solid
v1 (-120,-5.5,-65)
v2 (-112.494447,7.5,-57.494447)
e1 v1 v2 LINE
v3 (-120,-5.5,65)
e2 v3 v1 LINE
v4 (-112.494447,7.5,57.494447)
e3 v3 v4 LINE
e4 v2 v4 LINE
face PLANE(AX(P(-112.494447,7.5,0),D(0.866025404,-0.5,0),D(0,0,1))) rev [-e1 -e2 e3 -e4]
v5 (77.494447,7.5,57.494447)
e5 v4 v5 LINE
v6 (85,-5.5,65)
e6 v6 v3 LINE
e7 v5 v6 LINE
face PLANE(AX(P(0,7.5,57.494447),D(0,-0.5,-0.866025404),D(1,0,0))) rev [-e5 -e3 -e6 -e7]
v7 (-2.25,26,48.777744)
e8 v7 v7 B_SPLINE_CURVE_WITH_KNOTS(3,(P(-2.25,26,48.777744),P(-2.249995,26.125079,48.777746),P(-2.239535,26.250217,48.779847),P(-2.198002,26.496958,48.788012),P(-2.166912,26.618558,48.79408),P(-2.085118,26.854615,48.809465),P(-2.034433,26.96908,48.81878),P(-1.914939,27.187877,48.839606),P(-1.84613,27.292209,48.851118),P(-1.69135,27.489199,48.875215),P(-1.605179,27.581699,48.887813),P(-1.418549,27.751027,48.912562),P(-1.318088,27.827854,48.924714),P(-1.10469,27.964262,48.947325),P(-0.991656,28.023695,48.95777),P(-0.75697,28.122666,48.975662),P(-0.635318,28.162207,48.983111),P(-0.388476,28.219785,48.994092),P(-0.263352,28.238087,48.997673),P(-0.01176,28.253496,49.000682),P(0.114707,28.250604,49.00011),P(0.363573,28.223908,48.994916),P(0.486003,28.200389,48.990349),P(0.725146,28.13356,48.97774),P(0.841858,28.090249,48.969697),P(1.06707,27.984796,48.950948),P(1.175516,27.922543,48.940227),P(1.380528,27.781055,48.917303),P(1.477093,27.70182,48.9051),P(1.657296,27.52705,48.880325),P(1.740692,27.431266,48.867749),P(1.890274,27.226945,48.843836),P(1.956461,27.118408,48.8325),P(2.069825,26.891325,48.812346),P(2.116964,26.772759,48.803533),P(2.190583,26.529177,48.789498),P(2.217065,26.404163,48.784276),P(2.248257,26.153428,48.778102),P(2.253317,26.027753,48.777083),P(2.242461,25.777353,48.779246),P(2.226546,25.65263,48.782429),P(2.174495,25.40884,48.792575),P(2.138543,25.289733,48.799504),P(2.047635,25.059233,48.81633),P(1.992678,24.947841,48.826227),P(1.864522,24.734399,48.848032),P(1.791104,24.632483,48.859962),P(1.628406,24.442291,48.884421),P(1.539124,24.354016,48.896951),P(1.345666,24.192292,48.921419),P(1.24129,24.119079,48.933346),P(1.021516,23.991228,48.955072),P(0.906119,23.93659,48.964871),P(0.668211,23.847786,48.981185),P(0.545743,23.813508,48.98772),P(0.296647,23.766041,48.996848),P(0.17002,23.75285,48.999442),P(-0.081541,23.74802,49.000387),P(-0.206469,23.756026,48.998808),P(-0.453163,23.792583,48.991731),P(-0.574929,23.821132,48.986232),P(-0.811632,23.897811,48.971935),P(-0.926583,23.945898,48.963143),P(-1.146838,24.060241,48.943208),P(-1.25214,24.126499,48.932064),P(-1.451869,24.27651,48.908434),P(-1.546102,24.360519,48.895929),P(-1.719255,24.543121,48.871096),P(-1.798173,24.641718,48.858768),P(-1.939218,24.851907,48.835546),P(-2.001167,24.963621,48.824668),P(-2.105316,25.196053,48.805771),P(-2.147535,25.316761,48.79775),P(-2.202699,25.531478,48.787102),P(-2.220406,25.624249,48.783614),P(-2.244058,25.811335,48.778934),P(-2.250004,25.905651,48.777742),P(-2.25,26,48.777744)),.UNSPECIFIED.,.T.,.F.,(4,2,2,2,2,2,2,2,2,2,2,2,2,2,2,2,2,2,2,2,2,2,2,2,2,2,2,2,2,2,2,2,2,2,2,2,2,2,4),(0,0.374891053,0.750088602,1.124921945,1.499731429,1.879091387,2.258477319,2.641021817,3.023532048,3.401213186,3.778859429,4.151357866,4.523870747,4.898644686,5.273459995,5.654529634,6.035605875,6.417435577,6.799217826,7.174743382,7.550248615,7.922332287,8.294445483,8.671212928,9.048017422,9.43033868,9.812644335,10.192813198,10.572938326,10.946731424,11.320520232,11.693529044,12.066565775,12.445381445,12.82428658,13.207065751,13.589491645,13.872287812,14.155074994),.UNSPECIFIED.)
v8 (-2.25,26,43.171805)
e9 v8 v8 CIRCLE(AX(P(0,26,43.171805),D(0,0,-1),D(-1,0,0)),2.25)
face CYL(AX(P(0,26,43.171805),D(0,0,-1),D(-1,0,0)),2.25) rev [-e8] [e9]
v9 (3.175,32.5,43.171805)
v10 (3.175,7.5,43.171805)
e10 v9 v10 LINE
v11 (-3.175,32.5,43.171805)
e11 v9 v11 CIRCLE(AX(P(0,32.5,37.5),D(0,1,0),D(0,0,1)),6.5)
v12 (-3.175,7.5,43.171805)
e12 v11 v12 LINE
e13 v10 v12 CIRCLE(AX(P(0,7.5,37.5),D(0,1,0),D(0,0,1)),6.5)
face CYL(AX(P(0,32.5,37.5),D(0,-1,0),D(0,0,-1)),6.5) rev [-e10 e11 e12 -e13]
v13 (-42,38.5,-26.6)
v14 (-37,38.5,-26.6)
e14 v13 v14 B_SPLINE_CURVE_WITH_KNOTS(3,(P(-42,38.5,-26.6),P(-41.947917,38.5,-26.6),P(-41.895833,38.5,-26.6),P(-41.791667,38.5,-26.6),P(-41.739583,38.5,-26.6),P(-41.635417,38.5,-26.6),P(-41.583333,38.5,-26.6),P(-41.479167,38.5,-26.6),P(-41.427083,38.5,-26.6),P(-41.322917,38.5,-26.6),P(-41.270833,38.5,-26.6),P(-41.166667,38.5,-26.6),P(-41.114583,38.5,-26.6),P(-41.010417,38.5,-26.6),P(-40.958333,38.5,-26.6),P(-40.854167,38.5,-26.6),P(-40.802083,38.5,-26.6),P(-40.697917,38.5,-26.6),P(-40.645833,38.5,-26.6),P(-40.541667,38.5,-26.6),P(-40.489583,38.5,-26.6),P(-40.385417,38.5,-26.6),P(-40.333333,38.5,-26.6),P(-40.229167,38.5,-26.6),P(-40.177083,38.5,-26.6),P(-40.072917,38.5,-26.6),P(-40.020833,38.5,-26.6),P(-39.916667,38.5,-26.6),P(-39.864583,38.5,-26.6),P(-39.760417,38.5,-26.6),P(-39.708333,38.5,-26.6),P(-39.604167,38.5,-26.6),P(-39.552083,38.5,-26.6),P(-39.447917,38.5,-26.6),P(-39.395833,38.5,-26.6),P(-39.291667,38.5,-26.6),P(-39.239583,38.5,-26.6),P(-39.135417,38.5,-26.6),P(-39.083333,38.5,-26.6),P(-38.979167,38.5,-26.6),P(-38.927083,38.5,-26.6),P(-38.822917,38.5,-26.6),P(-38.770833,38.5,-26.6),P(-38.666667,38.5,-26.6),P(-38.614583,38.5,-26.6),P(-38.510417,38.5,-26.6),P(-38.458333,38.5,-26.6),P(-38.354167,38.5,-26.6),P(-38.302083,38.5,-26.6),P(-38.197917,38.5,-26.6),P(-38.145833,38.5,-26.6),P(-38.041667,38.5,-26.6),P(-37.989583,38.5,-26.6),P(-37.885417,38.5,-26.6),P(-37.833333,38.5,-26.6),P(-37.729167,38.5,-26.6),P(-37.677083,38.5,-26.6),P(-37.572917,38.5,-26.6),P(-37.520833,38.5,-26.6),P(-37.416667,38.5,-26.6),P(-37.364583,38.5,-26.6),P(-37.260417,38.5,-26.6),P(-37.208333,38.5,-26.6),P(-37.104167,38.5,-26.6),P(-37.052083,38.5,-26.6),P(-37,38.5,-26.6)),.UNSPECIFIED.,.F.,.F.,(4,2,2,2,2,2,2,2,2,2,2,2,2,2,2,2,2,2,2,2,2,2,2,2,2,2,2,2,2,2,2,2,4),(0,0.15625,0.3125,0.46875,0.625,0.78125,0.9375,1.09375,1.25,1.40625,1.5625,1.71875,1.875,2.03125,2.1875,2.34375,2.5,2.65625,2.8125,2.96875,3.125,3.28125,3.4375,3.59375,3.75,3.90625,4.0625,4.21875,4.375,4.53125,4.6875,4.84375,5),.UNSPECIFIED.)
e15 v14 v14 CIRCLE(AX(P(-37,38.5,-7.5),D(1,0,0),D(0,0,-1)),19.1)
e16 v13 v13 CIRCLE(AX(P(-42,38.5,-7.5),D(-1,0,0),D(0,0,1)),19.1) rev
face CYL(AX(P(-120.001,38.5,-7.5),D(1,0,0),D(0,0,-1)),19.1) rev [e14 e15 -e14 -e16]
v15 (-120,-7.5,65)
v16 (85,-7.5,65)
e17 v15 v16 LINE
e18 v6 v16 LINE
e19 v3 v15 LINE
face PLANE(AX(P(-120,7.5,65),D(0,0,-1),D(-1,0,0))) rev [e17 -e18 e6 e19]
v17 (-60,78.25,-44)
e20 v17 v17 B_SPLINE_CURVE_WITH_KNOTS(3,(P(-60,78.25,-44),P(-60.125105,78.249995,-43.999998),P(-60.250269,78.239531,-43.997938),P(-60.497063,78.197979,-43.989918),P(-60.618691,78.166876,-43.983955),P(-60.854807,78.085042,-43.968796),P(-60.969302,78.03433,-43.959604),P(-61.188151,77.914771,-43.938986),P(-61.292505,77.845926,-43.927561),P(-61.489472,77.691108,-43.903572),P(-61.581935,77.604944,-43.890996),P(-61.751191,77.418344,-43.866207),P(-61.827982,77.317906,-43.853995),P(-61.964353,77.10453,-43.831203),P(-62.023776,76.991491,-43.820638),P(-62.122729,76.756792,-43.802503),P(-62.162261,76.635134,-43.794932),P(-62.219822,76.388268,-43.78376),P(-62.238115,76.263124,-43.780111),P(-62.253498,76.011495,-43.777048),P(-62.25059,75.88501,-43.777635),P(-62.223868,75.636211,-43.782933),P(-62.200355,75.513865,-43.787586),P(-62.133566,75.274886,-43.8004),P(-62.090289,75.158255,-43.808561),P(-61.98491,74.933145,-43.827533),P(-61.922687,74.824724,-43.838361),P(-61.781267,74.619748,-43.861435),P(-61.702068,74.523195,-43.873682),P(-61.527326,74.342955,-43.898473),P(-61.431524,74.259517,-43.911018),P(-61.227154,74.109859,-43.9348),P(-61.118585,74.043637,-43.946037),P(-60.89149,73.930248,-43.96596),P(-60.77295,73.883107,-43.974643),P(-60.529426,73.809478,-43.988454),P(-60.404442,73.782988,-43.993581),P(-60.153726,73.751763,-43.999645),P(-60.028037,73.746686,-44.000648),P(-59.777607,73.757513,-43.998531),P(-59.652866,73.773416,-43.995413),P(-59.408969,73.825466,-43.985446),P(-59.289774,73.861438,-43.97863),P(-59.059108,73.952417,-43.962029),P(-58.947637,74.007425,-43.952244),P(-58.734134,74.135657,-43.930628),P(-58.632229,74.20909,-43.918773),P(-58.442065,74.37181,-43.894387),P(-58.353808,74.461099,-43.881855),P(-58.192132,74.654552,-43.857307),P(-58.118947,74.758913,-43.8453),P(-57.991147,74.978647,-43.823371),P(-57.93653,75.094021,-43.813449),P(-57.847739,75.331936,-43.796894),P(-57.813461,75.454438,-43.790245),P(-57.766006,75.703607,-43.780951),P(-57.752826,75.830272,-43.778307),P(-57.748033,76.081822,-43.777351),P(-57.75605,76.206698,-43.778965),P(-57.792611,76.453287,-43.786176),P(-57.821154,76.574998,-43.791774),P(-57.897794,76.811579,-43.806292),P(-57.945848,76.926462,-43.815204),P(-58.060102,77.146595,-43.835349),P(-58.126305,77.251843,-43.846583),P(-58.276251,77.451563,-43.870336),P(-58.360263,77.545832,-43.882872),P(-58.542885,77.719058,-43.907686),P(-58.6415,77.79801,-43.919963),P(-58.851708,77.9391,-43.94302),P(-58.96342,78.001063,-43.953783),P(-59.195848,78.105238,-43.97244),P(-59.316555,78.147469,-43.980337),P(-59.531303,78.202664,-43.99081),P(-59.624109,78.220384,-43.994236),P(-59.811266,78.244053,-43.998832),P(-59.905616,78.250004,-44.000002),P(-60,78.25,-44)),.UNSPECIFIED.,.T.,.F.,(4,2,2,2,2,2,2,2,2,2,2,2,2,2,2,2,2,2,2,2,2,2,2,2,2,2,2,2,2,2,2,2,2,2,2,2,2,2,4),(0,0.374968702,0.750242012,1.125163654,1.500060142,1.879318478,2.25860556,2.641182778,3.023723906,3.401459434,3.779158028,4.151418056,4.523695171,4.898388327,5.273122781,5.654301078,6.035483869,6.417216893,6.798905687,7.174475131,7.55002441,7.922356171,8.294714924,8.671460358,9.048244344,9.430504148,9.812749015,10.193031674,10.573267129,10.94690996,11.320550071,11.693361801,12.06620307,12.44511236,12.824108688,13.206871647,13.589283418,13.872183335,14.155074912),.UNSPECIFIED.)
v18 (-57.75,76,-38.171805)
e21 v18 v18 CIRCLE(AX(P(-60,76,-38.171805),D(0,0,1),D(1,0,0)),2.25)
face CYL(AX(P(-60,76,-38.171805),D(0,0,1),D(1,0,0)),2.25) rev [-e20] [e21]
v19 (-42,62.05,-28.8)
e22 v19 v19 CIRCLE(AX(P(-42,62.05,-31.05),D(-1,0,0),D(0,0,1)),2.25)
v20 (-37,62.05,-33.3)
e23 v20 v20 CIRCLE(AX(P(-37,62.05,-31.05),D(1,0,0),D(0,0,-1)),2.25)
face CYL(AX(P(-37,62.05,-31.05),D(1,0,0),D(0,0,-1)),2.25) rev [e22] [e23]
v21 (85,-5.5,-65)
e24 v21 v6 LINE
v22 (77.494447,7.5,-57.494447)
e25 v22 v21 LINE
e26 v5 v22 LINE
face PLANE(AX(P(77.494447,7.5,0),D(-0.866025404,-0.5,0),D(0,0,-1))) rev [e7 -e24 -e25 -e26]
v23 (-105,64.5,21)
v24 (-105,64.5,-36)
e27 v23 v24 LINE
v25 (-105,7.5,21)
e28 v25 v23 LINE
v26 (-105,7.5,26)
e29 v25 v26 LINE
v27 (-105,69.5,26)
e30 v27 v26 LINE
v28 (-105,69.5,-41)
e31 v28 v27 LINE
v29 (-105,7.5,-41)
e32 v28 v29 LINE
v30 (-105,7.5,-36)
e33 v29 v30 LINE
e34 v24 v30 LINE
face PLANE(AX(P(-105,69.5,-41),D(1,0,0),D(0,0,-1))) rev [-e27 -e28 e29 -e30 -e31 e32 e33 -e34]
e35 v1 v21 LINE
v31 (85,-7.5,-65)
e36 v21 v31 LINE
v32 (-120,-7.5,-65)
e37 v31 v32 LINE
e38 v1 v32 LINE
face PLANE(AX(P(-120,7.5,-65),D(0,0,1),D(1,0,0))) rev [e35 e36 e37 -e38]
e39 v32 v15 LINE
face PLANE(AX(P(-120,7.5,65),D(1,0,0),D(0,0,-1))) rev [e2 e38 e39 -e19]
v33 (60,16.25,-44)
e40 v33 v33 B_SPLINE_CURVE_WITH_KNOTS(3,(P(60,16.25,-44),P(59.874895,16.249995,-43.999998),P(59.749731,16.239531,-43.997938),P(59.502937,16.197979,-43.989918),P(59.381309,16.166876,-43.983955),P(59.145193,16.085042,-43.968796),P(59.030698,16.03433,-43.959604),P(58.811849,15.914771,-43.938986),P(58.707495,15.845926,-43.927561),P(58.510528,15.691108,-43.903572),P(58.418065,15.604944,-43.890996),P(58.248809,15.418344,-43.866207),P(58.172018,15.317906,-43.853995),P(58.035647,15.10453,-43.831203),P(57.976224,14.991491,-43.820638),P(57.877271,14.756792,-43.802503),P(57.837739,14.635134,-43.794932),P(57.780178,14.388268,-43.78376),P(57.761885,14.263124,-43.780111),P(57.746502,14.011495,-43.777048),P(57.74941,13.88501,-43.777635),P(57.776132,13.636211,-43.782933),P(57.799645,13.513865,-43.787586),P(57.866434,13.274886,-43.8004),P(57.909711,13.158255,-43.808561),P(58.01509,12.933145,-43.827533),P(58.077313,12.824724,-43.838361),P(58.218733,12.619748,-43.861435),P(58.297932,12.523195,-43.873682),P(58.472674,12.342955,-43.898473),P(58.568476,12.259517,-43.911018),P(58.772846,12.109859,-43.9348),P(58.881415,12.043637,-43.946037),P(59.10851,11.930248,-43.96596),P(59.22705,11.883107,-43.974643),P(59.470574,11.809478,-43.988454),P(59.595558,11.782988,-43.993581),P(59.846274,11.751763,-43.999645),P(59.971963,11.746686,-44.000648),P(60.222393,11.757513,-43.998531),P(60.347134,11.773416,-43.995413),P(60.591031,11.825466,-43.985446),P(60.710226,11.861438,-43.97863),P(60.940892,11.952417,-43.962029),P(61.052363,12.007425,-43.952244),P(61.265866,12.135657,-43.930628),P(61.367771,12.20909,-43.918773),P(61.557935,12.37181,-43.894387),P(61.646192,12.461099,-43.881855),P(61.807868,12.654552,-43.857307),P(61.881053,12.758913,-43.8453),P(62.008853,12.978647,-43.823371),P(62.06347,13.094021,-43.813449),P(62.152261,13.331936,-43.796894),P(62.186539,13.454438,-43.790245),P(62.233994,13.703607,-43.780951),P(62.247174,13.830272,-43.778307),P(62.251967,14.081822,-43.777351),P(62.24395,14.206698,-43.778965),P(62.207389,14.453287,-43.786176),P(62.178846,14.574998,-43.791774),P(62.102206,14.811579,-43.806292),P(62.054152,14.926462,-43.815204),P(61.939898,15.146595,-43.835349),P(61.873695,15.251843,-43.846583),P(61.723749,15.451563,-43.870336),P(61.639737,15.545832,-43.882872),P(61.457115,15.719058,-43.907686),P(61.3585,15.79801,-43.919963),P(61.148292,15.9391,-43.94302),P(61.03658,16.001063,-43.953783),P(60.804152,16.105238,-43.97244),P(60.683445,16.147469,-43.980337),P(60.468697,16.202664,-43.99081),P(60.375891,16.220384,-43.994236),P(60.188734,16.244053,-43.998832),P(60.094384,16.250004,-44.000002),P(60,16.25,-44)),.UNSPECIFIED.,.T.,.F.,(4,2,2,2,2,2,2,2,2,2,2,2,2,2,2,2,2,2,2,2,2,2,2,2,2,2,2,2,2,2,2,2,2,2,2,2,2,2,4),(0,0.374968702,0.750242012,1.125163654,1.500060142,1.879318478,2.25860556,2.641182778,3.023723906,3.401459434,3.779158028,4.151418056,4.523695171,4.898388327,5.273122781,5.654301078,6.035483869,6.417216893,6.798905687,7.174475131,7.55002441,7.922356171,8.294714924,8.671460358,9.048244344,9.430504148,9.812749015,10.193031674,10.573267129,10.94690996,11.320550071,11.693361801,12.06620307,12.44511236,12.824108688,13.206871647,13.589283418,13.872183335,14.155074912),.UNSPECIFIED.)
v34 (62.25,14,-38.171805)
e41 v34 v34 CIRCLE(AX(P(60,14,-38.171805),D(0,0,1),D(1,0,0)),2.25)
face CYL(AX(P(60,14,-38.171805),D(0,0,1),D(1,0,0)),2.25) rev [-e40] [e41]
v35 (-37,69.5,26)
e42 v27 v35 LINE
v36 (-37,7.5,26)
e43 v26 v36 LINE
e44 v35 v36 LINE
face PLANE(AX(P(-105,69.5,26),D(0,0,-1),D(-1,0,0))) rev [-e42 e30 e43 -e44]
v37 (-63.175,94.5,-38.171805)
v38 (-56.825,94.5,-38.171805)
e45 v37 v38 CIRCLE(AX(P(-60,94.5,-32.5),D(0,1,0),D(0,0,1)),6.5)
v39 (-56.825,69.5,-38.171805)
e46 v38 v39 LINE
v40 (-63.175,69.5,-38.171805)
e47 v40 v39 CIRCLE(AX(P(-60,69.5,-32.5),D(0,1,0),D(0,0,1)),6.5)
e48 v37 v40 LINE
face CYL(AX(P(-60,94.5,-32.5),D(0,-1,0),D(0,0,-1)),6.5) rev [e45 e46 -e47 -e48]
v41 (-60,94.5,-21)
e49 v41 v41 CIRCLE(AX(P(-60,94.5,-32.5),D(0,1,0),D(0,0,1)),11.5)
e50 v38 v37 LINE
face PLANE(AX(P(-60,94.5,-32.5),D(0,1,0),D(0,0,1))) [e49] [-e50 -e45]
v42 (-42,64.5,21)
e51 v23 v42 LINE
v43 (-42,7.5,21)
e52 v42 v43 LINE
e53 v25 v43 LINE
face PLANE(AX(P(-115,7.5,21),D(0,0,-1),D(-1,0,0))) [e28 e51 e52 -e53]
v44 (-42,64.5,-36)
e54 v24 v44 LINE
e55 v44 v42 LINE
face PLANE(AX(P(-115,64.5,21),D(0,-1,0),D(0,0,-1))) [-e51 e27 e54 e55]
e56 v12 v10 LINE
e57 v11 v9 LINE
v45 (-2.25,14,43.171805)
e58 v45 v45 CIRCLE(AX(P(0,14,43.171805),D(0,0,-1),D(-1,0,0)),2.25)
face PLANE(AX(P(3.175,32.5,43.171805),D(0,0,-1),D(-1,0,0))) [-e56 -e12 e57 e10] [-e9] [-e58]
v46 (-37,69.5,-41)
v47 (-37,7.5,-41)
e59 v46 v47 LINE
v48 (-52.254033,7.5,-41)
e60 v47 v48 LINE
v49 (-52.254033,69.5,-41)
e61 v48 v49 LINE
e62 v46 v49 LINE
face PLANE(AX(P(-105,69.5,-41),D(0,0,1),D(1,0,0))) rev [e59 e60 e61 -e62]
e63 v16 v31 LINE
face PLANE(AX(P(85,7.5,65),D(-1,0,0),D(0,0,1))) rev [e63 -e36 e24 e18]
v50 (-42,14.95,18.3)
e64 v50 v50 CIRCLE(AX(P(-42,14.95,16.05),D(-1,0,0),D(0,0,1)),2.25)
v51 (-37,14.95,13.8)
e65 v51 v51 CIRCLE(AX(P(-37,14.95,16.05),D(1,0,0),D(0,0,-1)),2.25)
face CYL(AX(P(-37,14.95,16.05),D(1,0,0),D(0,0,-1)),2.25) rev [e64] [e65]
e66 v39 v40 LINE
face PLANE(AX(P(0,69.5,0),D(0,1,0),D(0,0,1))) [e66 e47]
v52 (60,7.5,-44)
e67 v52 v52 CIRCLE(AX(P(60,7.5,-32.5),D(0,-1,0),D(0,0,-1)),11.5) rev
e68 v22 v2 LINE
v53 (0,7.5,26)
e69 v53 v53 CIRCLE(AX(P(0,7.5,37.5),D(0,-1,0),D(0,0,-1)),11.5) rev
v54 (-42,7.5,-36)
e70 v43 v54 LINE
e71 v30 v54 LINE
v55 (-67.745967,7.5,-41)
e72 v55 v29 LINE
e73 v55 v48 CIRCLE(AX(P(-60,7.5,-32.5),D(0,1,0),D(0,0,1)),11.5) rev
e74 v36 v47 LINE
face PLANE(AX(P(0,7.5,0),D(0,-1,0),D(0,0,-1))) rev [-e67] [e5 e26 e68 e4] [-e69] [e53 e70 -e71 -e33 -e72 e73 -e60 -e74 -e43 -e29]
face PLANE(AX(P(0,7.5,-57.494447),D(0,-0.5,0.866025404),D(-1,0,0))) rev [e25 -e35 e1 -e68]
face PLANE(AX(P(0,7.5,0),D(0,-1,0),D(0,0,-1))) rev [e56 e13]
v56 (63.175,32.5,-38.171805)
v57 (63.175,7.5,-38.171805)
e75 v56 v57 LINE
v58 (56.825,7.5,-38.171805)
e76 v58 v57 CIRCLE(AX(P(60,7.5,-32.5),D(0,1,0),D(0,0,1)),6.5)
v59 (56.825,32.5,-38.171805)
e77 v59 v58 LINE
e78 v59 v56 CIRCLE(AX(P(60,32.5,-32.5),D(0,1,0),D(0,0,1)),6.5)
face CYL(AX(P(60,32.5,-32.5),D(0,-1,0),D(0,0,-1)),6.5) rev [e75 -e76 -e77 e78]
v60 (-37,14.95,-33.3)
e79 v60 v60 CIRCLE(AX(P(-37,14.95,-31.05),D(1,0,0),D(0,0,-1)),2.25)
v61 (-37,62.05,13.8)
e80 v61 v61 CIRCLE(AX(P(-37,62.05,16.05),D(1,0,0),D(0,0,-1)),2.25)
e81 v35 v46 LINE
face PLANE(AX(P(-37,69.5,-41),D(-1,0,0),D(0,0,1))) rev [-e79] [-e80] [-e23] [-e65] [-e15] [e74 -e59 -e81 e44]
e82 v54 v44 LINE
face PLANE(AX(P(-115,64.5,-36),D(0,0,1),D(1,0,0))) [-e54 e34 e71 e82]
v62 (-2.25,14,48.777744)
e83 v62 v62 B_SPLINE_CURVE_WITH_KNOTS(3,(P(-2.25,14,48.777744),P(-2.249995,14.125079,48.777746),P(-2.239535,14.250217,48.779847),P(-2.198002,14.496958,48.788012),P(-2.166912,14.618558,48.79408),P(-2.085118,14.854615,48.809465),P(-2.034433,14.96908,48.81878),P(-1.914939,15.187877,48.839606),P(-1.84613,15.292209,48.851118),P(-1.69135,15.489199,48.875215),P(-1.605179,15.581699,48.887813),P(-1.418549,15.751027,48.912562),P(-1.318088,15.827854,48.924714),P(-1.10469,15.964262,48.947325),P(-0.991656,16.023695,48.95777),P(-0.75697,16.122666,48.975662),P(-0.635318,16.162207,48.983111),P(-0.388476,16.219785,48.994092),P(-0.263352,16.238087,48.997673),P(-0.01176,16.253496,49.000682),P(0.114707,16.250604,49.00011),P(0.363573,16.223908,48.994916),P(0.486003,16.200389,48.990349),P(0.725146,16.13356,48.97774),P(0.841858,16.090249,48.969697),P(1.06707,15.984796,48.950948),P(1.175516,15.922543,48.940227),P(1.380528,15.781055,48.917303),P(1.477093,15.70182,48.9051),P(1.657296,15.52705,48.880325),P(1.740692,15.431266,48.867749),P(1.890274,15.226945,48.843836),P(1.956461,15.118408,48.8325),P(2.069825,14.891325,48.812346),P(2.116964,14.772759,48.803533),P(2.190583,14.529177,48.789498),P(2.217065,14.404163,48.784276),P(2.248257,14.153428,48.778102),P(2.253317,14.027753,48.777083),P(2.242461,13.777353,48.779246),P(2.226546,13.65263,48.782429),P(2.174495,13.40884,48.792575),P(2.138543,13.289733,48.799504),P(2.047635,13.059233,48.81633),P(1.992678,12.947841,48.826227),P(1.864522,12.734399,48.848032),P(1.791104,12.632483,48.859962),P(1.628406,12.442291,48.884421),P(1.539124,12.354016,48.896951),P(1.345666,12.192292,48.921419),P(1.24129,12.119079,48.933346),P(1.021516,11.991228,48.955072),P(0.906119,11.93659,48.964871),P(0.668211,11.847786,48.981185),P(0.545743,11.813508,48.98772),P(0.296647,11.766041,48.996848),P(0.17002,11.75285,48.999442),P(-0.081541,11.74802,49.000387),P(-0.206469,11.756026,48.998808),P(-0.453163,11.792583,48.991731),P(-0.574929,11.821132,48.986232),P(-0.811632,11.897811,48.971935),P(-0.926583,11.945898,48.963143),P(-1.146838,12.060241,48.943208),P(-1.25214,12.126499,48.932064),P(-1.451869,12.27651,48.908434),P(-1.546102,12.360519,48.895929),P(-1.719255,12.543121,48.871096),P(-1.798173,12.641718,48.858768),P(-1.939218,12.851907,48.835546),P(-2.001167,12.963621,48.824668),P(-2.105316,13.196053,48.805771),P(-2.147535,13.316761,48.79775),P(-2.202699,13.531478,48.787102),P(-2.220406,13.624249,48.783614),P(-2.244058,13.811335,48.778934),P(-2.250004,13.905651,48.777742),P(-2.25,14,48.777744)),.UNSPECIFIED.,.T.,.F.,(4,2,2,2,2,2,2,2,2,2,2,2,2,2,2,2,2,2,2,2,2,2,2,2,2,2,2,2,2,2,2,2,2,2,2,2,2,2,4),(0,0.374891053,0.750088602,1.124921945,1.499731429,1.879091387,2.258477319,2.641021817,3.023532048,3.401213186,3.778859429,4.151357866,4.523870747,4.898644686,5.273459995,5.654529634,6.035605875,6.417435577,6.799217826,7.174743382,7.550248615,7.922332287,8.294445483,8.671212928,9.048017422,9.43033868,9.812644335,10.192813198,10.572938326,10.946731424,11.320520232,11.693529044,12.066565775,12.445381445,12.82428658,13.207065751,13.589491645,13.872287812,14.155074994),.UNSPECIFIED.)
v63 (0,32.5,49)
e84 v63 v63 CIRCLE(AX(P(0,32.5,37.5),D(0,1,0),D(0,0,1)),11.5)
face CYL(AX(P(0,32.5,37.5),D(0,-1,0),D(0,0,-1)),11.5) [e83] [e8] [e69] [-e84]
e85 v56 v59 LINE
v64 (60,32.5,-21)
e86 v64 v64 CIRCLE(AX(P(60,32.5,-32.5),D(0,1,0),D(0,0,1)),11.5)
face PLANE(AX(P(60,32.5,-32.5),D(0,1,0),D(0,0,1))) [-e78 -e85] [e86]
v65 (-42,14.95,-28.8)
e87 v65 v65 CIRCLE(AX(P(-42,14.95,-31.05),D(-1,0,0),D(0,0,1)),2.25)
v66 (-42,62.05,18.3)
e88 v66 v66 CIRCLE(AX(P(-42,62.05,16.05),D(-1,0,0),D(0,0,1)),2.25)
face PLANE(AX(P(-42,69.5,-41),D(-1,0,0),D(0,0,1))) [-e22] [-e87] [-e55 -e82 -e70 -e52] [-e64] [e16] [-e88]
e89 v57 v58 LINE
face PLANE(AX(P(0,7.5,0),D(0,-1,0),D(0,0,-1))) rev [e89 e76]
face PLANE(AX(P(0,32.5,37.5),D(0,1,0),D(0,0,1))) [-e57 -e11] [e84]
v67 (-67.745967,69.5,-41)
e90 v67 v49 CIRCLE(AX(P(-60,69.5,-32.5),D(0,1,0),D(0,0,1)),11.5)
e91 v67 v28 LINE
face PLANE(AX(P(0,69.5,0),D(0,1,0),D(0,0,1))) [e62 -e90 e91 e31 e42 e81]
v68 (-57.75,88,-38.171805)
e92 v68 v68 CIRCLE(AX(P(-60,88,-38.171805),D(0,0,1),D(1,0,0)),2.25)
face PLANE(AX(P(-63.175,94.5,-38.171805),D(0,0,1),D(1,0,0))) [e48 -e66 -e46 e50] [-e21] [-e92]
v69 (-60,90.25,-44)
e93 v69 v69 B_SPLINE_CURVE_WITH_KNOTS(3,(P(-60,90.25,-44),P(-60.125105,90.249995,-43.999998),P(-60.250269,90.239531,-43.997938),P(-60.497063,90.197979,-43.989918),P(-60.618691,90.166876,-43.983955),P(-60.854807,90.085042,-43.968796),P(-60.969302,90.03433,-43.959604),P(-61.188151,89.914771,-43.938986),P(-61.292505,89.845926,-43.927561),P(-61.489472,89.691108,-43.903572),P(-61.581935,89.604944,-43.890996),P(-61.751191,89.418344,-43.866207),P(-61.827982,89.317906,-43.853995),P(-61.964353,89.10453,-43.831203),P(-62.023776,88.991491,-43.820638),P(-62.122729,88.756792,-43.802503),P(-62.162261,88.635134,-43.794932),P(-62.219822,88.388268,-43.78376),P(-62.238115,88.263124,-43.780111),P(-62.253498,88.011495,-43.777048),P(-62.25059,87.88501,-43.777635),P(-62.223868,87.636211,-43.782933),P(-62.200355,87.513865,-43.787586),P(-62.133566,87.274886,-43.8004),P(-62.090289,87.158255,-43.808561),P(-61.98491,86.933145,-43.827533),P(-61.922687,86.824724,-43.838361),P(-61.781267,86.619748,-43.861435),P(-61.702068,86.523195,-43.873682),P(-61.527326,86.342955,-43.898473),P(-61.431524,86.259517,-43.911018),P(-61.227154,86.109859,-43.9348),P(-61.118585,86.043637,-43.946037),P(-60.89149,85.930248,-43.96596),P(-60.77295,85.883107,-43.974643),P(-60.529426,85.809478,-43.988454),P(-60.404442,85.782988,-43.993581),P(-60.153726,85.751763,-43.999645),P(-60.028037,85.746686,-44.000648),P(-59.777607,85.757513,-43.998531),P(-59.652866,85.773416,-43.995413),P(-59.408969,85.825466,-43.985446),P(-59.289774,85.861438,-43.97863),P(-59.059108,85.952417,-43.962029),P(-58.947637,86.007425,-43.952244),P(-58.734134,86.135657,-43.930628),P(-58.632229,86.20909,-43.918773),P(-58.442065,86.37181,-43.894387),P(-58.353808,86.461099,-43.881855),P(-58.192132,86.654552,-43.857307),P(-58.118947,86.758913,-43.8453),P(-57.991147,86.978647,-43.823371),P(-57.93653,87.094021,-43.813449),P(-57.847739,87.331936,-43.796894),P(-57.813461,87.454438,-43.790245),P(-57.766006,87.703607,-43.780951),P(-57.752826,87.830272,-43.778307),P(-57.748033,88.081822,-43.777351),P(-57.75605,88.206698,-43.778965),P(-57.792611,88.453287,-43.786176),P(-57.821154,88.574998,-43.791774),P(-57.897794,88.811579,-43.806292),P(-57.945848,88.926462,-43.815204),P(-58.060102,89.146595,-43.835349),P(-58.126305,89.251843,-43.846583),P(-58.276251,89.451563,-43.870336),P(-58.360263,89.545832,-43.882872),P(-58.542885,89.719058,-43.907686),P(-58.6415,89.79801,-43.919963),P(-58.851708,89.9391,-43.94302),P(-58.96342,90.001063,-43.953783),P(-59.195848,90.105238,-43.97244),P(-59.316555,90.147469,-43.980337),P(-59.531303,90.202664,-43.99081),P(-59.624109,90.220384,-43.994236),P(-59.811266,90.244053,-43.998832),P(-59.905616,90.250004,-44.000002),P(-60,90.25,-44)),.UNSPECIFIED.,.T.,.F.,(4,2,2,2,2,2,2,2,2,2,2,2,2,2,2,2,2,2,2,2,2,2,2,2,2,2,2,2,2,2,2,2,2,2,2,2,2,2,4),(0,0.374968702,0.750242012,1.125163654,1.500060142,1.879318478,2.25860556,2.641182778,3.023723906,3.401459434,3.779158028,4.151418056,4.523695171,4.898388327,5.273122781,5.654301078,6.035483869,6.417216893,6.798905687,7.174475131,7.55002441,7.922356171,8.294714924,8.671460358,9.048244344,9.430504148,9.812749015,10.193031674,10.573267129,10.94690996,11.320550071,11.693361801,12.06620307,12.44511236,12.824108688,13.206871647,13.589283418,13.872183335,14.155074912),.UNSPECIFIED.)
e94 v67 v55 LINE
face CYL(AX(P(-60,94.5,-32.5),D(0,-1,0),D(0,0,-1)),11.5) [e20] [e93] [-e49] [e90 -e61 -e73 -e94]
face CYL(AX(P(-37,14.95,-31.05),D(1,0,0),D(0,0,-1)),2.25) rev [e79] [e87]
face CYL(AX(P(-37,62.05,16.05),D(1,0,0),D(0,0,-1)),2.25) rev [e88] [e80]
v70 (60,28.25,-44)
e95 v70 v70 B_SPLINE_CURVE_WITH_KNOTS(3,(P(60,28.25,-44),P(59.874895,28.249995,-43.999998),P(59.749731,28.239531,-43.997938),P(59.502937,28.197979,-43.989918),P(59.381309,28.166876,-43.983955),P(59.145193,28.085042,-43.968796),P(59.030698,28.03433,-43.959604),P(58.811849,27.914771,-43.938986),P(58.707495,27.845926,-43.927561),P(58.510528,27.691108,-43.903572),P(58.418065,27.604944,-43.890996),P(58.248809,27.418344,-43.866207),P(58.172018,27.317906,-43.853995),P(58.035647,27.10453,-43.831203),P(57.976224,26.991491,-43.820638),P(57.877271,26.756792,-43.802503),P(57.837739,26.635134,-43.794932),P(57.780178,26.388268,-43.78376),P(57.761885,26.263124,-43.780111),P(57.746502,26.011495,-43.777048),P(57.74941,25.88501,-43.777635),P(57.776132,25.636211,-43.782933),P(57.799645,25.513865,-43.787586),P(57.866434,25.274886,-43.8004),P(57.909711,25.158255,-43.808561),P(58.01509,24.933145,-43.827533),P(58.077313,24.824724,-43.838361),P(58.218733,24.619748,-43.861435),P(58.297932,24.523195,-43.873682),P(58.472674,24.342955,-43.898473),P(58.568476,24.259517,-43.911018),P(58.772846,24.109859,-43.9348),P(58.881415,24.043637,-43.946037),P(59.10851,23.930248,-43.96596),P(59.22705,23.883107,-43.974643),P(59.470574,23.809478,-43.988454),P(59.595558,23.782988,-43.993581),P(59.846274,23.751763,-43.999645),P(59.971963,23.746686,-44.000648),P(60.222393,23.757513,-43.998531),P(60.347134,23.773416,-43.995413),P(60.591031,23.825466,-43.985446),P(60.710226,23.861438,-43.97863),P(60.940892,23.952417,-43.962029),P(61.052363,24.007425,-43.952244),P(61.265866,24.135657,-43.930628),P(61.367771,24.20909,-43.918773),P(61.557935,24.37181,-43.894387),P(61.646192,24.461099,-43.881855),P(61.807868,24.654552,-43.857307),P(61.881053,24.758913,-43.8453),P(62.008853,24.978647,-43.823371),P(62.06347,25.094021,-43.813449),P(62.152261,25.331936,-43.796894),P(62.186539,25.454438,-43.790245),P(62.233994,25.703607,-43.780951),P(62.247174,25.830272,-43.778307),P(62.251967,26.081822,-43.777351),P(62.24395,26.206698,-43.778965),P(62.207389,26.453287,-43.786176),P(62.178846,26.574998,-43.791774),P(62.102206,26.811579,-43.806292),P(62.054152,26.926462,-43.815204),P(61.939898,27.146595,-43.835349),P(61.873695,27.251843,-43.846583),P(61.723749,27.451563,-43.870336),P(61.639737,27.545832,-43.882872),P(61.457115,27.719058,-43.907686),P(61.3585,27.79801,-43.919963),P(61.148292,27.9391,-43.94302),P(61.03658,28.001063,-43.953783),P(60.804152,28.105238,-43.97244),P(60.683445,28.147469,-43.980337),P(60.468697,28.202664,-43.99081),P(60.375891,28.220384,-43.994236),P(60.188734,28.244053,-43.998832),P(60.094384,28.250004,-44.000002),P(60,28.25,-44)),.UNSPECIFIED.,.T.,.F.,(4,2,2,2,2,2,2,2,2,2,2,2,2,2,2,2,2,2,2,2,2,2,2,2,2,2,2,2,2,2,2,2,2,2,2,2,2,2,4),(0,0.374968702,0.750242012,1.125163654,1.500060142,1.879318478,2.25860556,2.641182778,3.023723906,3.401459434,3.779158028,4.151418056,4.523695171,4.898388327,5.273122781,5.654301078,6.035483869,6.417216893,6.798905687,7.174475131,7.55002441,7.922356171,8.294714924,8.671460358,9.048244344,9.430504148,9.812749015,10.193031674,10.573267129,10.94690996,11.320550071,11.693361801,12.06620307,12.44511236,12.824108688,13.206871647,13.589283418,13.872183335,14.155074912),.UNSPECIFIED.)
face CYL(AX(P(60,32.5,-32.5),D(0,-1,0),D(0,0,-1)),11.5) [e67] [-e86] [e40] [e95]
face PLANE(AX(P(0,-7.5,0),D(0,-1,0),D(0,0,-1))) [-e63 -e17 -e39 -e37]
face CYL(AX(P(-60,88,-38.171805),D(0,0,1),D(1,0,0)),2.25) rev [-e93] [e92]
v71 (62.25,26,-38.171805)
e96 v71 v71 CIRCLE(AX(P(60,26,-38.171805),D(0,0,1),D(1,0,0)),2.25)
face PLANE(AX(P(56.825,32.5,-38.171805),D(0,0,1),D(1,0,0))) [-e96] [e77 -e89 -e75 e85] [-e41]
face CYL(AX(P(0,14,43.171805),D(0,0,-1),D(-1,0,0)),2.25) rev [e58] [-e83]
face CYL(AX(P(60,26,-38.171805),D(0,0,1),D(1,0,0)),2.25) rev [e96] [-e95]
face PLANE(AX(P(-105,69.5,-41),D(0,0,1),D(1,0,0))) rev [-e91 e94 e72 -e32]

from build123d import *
from OCP.BRepFilletAPI import BRepFilletAPI_MakeChamfer

# Parameters (mm, degrees)
SKETCH1_W                      = 205
SKETCH1_H                      = 130
BOSS_EXTRUDE1_DEPTH            = 7.5
CHAMFER1_SIZE                  = 13
CHAMFER1_SIZE2                 = 7.505553499
SKETCH3_W                      = 68
SKETCH3_H                      = 67
BOSS_EXTRUDE2_DEPTH            = 62
CUT_EXTRUDE4_DEPTH             = 10
CUT_EXTRUDE4_DEPTH_BACK        = 63
SKETCH8_W                      = 57
SKETCH8_H                      = 57
SKETCH5_R                      = 11.5
SHAFT_1_DEPTH                  = 25
F_4_5_4_5_DIAMETER_HOLE1_D     = 4.5
F_4_5_4_5_DIAMETER_HOLE1_DEPTH = 5.829194732
SKETCH9_R                      = 11.5
SHAFT_2_DEPTH                  = 25
SUPPORT_START                  = 7.5
SUPPORT_STRUCTURE_DEPTH        = 62
F_4_5_4_5_DIAMETER_HOLE2_D     = 4.5
F_4_5_4_5_DIAMETER_HOLE2_DEPTH = 5.829194732
SKETCH15_R                     = 11.5
SHAFT_3_DEPTH                  = 25
F_4_5_4_5_DIAMETER_HOLE3_D     = 4.5
F_4_5_4_5_DIAMETER_HOLE3_DEPTH = 5.829194732
CUT_EXTRUDE3_REACH             = 169.449
SKETCH18_R                     = 19.1
F_4_5_4_5_DIAMETER_HOLE4_D     = 4.5
CIRPATTERN1_START              = -42
CIRPATTERN1_OUTLINE_R          = 2.25
CIRPATTERN1_DEPTH              = 5
LPATTERN1_COUNT                = 2
LPATTERN1_PITCH                = 12


# Read off the part's stored shape, not the designer's step: Support Structure, CirPattern1
with BuildPart() as part:
    # Sketch1 → Boss-Extrude1 (new, symmetric)
    with BuildSketch(Plane(origin=(0, 0, 0), x_dir=(1, 0, 0), z_dir=(0, 1, 0))):
        with Locations((-17.5, 0)):
            Rectangle(SKETCH1_W, SKETCH1_H)
    extrude(amount=BOSS_EXTRUDE1_DEPTH, both=True)

    # Chamfer1: one chamfer whose edges measure the first distance from different faces: ONE call of the kernel's chamfer builder (chamfer() names one face for all edges)
    chamfer1_edges_1 = [part.edges().sort_by_distance(p)[0] for p in [
        (-120, 7.5, 0),
    ]]
    chamfer1_side_1 = [part.faces().sort_by_distance(p)[0] for p in [
        (-120, 0, 0),
    ]]
    chamfer1_edges_2 = [part.edges().sort_by_distance(p)[0] for p in [
        (-17.5, 7.5, 65),
    ]]
    chamfer1_side_2 = [part.faces().sort_by_distance(p)[0] for p in [
        (-17.5, 0, 65),
    ]]
    chamfer1_edges_3 = [part.edges().sort_by_distance(p)[0] for p in [
        (85, 7.5, 0),
    ]]
    chamfer1_side_3 = [part.faces().sort_by_distance(p)[0] for p in [
        (85, 0, 0),
    ]]
    chamfer1_edges_4 = [part.edges().sort_by_distance(p)[0] for p in [
        (-17.5, 7.5, -65),
    ]]
    chamfer1_side_4 = [part.faces().sort_by_distance(p)[0] for p in [
        (-17.5, 0, -65),
    ]]
    chamfer1 = BRepFilletAPI_MakeChamfer(part.part.solid().wrapped)
    for e in chamfer1_edges_1:
        chamfer1.Add(CHAMFER1_SIZE, CHAMFER1_SIZE2, e.wrapped, chamfer1_side_1[0].wrapped)  # the first distance lies on this face
    for e in chamfer1_edges_2:
        chamfer1.Add(CHAMFER1_SIZE, CHAMFER1_SIZE2, e.wrapped, chamfer1_side_2[0].wrapped)  # the first distance lies on this face
    for e in chamfer1_edges_3:
        chamfer1.Add(CHAMFER1_SIZE, CHAMFER1_SIZE2, e.wrapped, chamfer1_side_3[0].wrapped)  # the first distance lies on this face
    for e in chamfer1_edges_4:
        chamfer1.Add(CHAMFER1_SIZE, CHAMFER1_SIZE2, e.wrapped, chamfer1_side_4[0].wrapped)  # the first distance lies on this face
    add(Compound.cast(chamfer1.Shape()), mode=Mode.REPLACE)

    # Sketch3 → Boss-Extrude2 (add)
    with BuildSketch(Plane(origin=(0, 7.5, 0), x_dir=(1, 0, 0), z_dir=(0, 1, 0))):
        with Locations((-71, 7.5)):
            Rectangle(SKETCH3_W, SKETCH3_H)
    extrude(amount=BOSS_EXTRUDE2_DEPTH)

    # Sketch8 → Cut-Extrude4 (cut, two sides: drawn at the far end of the back side and taken through both)
    with BuildSketch(Plane.ZY.offset(105).offset(-CUT_EXTRUDE4_DEPTH_BACK)):
        with Locations((-7.5, 36)):
            Rectangle(SKETCH8_W, SKETCH8_H)
    extrude(amount=CUT_EXTRUDE4_DEPTH + CUT_EXTRUDE4_DEPTH_BACK, mode=Mode.SUBTRACT)

    # Sketch5 → Shaft 1 (add)
    with BuildSketch(Plane(origin=(0, 7.5, 0), x_dir=(1, 0, 0), z_dir=(0, 1, 0))):
        with Locations(Location((60, 32.5, 0), (0, 0, 90))):
            Circle(SKETCH5_R)
        with BuildLine():
            Line((56.825, 38.171805268), (63.175, 38.171805268))
            ThreePointArc((63.175, 38.171805268), (60, 26), (56.825, 38.171805268))
        make_face(mode=Mode.SUBTRACT)
    extrude(amount=SHAFT_1_DEPTH)

    # Ø4.5 (4.5) Diameter Hole1
    with Locations(Plane.XY.offset(-38.171805268)):
        with Locations((60, 26)):
            f_4_5_4_5_diameter_hole1 = Hole(F_4_5_4_5_DIAMETER_HOLE1_D / 2, depth=F_4_5_4_5_DIAMETER_HOLE1_DEPTH)

    # Sketch9 → Shaft 2 (add)
    with BuildSketch(Plane(origin=(0, 69.5, 0), x_dir=(1, 0, 0), z_dir=(0, 1, 0))):
        with Locations(Location((-60, 32.5, 0), (0, 0, 47.657394548))):
            Circle(SKETCH9_R)
        with BuildLine():
            Line((-63.175, 38.171805268), (-56.825, 38.171805268))
            ThreePointArc((-56.825, 38.171805268), (-60, 26), (-63.175, 38.171805268))
        make_face(mode=Mode.SUBTRACT)
    extrude(amount=SHAFT_2_DEPTH)

    # Support Structure outline → Support Structure (add)
    with BuildSketch(Plane(origin=(0, 0, 0), x_dir=(1, 0, 0), z_dir=(0, 1, 0)).offset(SUPPORT_START)):
        with BuildLine():
            Line((-67.745966692, 41), (-52.254033308, 41))
            ThreePointArc((-52.254033308, 41), (-60, 44), (-67.745966692, 41))
        make_face()
    extrude(amount=SUPPORT_STRUCTURE_DEPTH)

    # Ø4.5 (4.5) Diameter Hole2
    with Locations(Plane.XY.offset(-38.171805268)):
        with Locations((-60, 88)):
            f_4_5_4_5_diameter_hole2 = Hole(F_4_5_4_5_DIAMETER_HOLE2_D / 2, depth=F_4_5_4_5_DIAMETER_HOLE2_DEPTH)

    # Sketch15 → Shaft 3 (add)
    with BuildSketch(Plane(origin=(0, 7.5, 0), x_dir=(1, 0, 0), z_dir=(0, 1, 0))):
        with Locations(Location((0, -37.5, 0), (0, 0, 90))):
            Circle(SKETCH15_R)
        with BuildLine():
            Line((3.175, -43.171805268), (-3.175, -43.171805268))
            ThreePointArc((-3.175, -43.171805268), (0, -31), (3.175, -43.171805268))
        make_face(mode=Mode.SUBTRACT)
    extrude(amount=SHAFT_3_DEPTH)

    # Ø4.5 (4.5) Diameter Hole3
    with Locations(Plane(origin=(0, 0, 43.171805268), x_dir=(-1, 0, 0), z_dir=(0, 0, -1))):
        with Locations((0, 26)):
            f_4_5_4_5_diameter_hole3 = Hole(F_4_5_4_5_DIAMETER_HOLE3_D / 2, depth=F_4_5_4_5_DIAMETER_HOLE3_DEPTH)

    # Sketch18 → Cut-Extrude3 (cut, up to next)
    with BuildSketch(Plane(origin=(-37, 0, 0), x_dir=(0, 0, -1), z_dir=(1, 0, 0)), mode=Mode.PRIVATE) as cut_extrude3_sk1:
        with Locations((7.5, 38.5)):
            Circle(SKETCH18_R)
    cut_extrude3_tool1 = extrude(cut_extrude3_sk1.sketch, amount=-CUT_EXTRUDE3_REACH, mode=Mode.PRIVATE) & part.part
    add(cut_extrude3_tool1.solids().sort_by_distance((-37, 38.5, -7.5))[0], mode=Mode.SUBTRACT)

    # Ø4.5 (4.5) Diameter Hole4 (through all)
    with Locations(Plane(origin=(-37, 0, 0), x_dir=(0, 0, -1), z_dir=(1, 0, 0))):
        with Locations((31.05, 62.05)):
            Hole(F_4_5_4_5_DIAMETER_HOLE4_D / 2)

    # CirPattern1 outline → CirPattern1 (cut)
    with BuildSketch(Plane.YZ.offset(CIRPATTERN1_START)):
        with Locations((62.05, 16.05)):
            Circle(CIRPATTERN1_OUTLINE_R)
        with Locations((14.95, 16.05)):
            Circle(CIRPATTERN1_OUTLINE_R)
        with Locations((14.95, -31.05)):
            Circle(CIRPATTERN1_OUTLINE_R)
    extrude(amount=CIRPATTERN1_DEPTH, mode=Mode.SUBTRACT)

    # LPattern1: Ø4.5 (4.5) Diameter Hole1, Ø4.5 (4.5) Diameter Hole2, Ø4.5 (4.5) Diameter Hole3 ×2
    with Locations(*[(0, -i * LPATTERN1_PITCH, 0) for i in range(1, LPATTERN1_COUNT)]):
        add(f_4_5_4_5_diameter_hole1, mode=Mode.SUBTRACT)
        add(f_4_5_4_5_diameter_hole2, mode=Mode.SUBTRACT)
        add(f_4_5_4_5_diameter_hole3, mode=Mode.SUBTRACT)


solid = part.part
